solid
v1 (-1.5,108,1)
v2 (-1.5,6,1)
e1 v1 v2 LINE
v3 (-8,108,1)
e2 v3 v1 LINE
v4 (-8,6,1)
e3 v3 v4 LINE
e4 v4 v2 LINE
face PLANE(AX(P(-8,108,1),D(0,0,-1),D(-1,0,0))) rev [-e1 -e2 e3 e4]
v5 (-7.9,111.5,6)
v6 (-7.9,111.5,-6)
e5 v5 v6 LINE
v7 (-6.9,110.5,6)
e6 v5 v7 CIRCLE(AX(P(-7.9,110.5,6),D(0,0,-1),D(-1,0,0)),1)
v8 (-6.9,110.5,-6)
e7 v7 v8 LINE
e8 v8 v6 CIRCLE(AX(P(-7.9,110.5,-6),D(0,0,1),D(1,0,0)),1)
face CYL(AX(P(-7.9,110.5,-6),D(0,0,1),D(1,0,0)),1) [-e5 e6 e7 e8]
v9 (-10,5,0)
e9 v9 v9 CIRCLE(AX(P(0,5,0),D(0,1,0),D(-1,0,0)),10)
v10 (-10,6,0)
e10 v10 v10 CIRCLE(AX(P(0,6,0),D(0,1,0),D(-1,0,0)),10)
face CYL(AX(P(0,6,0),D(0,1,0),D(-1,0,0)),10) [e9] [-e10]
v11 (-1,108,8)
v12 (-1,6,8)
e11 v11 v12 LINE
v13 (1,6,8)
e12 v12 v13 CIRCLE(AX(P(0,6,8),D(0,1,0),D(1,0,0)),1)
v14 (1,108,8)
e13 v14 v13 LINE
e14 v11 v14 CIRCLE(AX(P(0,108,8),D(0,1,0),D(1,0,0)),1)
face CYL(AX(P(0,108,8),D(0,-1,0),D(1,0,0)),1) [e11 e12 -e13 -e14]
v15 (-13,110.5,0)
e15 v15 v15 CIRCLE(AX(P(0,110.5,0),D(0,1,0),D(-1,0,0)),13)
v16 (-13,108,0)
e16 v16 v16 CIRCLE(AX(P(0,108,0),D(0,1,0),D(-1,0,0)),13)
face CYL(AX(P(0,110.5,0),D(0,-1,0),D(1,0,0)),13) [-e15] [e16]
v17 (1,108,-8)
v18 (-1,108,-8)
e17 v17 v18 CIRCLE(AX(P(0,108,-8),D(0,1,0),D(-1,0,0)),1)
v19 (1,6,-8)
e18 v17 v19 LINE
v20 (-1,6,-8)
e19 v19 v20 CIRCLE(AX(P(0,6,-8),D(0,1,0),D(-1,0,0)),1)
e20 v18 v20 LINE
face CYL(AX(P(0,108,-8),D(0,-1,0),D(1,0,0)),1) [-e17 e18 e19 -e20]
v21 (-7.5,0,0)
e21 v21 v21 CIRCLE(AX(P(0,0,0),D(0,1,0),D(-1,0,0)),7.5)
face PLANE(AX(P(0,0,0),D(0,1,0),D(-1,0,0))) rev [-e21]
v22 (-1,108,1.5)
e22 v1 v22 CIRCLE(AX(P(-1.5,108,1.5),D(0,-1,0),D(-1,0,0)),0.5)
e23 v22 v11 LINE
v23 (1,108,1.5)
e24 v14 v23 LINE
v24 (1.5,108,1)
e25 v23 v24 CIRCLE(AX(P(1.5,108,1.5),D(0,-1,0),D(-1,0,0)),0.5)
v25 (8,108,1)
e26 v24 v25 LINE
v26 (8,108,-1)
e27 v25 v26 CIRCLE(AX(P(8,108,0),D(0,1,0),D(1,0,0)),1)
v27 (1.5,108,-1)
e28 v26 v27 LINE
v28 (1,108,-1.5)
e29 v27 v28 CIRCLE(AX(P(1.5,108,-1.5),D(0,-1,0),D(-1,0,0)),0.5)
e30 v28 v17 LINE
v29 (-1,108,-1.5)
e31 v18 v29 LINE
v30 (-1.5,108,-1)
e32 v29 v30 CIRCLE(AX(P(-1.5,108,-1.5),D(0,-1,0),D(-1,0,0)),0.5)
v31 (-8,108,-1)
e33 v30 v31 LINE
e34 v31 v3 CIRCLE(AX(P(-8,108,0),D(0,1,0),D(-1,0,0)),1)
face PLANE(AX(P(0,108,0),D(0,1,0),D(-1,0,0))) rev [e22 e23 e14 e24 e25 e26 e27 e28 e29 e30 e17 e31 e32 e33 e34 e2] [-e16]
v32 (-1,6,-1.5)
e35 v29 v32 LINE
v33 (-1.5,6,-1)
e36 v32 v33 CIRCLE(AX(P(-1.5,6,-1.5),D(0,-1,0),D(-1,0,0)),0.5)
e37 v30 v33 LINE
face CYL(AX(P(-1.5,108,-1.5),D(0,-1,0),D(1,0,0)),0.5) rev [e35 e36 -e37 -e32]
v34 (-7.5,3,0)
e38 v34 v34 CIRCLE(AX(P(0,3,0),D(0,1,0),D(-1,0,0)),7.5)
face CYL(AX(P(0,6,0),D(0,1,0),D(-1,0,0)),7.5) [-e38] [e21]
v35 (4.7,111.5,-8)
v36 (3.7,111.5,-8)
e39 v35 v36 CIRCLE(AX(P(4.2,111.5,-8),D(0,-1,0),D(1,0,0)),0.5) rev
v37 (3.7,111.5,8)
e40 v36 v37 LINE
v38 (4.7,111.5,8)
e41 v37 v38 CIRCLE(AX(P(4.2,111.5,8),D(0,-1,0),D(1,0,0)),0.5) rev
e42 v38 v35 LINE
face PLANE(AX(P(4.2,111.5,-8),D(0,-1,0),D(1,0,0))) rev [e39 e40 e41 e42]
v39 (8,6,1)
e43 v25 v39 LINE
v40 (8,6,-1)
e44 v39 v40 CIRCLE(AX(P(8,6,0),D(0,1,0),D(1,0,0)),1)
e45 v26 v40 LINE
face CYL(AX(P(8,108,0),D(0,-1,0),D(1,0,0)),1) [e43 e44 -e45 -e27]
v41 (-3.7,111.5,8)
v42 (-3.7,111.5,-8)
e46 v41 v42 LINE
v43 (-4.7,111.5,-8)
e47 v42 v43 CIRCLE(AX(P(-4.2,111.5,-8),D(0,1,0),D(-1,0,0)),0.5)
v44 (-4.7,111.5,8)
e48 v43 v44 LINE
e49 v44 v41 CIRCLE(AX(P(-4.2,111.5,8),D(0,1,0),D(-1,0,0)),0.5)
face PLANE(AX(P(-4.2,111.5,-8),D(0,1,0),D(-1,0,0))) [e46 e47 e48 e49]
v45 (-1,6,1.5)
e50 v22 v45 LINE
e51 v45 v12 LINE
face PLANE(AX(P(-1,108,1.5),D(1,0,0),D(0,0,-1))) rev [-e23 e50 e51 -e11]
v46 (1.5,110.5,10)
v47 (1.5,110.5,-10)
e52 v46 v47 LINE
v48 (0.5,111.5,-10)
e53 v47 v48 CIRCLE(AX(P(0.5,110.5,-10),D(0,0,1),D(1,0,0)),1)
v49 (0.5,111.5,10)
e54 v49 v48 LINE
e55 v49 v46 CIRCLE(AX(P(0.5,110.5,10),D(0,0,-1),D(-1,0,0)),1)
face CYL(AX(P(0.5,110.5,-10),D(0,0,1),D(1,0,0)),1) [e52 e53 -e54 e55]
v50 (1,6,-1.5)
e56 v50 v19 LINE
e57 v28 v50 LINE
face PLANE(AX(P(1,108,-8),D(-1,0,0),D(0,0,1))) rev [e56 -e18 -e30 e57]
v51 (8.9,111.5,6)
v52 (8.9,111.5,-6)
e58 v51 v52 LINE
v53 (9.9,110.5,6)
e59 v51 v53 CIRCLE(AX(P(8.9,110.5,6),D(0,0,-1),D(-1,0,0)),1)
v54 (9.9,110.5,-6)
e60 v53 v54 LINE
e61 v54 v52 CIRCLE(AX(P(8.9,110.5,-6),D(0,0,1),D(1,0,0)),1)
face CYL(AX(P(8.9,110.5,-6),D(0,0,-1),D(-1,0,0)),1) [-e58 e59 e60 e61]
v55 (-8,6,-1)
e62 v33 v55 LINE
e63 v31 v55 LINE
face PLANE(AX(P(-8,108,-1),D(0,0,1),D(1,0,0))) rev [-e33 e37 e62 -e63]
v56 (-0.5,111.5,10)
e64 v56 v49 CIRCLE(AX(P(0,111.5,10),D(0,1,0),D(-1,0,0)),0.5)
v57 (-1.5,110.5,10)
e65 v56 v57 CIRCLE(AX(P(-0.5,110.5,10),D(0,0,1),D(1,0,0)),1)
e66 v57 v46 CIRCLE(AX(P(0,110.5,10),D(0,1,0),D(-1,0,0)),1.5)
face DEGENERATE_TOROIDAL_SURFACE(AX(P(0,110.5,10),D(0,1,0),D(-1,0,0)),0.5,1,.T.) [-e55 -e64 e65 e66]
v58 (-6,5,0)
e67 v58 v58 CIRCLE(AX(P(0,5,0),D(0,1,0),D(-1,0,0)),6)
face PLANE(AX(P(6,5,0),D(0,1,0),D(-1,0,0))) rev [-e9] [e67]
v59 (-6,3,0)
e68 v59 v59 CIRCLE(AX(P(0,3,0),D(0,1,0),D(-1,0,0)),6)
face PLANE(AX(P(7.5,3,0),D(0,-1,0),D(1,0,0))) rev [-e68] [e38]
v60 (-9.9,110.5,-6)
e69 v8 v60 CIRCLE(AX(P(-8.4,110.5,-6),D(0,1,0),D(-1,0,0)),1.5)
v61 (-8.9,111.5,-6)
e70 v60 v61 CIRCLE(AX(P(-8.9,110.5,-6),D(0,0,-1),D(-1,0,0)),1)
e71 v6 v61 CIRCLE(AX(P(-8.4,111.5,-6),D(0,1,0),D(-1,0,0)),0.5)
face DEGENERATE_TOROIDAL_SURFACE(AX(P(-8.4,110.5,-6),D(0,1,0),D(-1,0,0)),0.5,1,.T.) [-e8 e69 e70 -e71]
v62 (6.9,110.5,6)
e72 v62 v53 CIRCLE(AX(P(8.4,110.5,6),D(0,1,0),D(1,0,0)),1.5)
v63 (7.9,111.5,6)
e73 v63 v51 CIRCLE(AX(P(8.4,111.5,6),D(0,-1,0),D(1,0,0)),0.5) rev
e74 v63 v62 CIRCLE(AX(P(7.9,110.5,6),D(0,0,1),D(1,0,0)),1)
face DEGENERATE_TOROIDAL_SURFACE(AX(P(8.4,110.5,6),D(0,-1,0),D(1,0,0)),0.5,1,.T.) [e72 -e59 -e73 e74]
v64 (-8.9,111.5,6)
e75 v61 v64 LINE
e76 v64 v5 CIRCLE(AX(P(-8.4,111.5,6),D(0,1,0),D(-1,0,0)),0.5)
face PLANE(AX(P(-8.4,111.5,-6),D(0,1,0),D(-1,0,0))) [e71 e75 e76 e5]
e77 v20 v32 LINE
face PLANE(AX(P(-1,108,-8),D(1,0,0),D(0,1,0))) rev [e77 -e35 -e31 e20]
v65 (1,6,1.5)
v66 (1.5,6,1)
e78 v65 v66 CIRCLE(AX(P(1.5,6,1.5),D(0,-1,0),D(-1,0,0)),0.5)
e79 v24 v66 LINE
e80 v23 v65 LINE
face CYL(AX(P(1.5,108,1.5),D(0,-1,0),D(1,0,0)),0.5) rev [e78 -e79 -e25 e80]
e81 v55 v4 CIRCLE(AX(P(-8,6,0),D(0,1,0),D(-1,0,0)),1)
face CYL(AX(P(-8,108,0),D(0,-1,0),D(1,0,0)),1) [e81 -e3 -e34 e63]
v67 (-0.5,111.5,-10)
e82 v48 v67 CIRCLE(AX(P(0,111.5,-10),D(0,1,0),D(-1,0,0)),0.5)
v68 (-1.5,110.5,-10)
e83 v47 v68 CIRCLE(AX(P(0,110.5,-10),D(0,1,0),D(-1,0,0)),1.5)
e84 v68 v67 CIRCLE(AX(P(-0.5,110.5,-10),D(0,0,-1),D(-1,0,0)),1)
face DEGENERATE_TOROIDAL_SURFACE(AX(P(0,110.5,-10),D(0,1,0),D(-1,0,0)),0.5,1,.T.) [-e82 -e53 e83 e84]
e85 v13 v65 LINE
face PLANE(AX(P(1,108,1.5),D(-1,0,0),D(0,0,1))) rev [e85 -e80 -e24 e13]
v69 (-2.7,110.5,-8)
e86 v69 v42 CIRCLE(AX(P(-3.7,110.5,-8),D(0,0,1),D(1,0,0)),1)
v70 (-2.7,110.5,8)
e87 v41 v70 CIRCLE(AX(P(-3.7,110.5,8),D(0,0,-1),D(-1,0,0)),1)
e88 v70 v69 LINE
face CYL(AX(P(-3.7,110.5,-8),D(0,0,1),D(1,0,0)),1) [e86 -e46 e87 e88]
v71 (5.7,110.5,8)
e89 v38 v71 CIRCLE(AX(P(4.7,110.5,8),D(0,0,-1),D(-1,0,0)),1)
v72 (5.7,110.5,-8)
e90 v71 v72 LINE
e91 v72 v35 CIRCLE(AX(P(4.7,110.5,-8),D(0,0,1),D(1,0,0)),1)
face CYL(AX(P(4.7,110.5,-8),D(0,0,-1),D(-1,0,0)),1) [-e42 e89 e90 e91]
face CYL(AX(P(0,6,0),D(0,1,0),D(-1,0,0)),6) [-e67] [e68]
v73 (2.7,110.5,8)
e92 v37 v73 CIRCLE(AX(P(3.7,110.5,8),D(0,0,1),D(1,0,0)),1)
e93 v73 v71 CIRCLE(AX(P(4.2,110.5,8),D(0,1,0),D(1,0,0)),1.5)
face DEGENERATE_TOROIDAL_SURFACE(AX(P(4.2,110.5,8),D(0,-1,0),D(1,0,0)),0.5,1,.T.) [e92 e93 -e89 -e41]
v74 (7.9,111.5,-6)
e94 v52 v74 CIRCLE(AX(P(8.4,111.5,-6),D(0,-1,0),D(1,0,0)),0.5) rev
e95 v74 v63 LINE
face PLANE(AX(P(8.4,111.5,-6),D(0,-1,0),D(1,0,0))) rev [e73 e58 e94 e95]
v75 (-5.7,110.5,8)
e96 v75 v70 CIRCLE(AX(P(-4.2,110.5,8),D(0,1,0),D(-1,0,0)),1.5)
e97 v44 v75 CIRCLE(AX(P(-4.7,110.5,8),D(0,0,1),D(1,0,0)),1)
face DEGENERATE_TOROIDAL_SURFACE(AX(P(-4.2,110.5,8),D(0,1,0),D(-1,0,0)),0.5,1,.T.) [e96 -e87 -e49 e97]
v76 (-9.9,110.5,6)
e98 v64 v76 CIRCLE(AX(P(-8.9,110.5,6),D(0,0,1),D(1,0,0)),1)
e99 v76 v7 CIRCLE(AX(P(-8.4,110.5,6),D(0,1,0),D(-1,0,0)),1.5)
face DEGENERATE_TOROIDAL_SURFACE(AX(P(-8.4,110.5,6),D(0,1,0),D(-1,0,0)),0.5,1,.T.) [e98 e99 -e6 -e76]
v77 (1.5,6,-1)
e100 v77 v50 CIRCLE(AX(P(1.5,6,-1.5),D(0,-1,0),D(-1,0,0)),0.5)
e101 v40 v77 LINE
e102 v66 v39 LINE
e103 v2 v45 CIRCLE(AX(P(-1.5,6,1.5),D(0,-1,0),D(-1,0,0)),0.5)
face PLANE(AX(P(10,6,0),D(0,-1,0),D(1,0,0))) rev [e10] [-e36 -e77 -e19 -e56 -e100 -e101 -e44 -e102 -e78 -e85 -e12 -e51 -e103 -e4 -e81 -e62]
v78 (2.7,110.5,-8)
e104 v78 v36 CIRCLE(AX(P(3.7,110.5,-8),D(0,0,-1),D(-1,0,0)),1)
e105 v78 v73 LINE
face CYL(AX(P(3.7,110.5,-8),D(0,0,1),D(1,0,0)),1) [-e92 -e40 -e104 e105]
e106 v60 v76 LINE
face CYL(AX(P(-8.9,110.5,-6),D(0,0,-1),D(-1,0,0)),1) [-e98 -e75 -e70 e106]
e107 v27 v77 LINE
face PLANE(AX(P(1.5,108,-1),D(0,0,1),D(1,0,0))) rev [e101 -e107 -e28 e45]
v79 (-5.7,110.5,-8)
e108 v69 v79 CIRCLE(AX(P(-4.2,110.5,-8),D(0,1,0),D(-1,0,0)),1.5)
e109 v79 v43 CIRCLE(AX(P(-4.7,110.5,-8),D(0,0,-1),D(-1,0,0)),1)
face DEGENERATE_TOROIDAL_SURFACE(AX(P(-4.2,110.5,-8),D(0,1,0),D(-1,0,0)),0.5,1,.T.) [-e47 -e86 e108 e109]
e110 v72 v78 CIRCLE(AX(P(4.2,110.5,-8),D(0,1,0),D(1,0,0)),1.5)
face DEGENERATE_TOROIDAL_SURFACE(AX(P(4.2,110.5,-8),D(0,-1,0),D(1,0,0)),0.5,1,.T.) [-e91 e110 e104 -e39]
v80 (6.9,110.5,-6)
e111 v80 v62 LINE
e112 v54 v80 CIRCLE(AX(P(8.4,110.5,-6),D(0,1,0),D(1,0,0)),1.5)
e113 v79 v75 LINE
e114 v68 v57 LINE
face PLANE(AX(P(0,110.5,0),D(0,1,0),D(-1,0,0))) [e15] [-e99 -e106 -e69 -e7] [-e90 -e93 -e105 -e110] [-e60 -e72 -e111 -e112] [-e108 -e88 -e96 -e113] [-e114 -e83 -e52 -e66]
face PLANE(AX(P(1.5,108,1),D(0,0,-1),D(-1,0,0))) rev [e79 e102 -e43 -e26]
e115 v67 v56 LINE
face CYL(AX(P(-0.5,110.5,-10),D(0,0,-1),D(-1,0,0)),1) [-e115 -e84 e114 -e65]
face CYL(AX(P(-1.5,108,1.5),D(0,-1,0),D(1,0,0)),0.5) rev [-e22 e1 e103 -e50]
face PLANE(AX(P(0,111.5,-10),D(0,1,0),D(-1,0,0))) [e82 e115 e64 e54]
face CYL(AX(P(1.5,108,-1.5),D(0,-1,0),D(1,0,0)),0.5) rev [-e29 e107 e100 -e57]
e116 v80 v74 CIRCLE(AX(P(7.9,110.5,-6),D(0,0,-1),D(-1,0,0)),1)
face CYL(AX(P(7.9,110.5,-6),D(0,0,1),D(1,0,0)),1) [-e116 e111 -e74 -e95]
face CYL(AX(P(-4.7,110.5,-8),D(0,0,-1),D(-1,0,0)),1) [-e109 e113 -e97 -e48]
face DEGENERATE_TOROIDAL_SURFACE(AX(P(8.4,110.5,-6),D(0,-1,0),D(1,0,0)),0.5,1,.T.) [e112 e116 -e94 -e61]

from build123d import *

# Parameters (mm, degrees)
BOSS_EXTRUDE1_DEPTH = 102
SKETCH3_R           = 13
BOSS_EXTRUDE2_DEPTH = 2.5
BOSS_EXTRUDE3_DEPTH = 1
FILLET1_R           = 1


with BuildPart() as part:
    # Sketch1 → Revolve1 (revolve)
    with BuildSketch(Plane.XY, mode=Mode.PRIVATE) as revolve1_sk:
        Polygon((0, 0), (7.5, 0), (7.5, 3), (6, 3), (6, 5), (10, 5), (10, 6), (0, 6), align=None)
    revolve(revolve1_sk.sketch.rotate(Axis((0, 6, 0), (0, -1, 0)), 180), axis=Axis((0, 6, 0), (0, -1, 0)))

    # Sketch2 → Boss-Extrude1 (add)
    with BuildSketch(Plane(origin=(0, 6, 0), x_dir=(1, 0, 0), z_dir=(0, 1, 0))):
        with BuildLine():
            Line((-1, 8), (-1, 1.5))
            ThreePointArc((-1, 1.5), (-1.146446609, 1.146446609), (-1.5, 1))
            Line((-1.5, 1), (-8, 1))
            ThreePointArc((-8, 1), (-9, 0), (-8, -1))
            Line((-8, -1), (-1.5, -1))
            ThreePointArc((-1.5, -1), (-1.146446609, -1.146446609), (-1, -1.5))
            Line((-1, -1.5), (-1, -8))
            ThreePointArc((-1, -8), (0, -9), (1, -8))
            Line((1, -8), (1, -1.5))
            ThreePointArc((1, -1.5), (1.146446609, -1.146446609), (1.5, -1))
            Line((1.5, -1), (8, -1))
            ThreePointArc((8, -1), (9, 0), (8, 1))
            Line((8, 1), (1.5, 1))
            ThreePointArc((1.5, 1), (1.146446609, 1.146446609), (1, 1.5))
            Line((1, 1.5), (1, 8))
            ThreePointArc((1, 8), (0, 9), (-1, 8))
        make_face()
    extrude(amount=BOSS_EXTRUDE1_DEPTH)

    # Sketch3 → Boss-Extrude2 (add)
    with BuildSketch(Plane(origin=(0, 108, 0), x_dir=(1, 0, 0), z_dir=(0, 1, 0))):
        with Locations(Location((0, 0, 0), (0, 0, 180))):
            Circle(SKETCH3_R)
    extrude(amount=BOSS_EXTRUDE2_DEPTH)

    # Sketch4 → Boss-Extrude3 (add)
    with BuildSketch(Plane(origin=(0, 110.5, 0), x_dir=(1, 0, 0), z_dir=(0, 1, 0))):
        with BuildLine():
            Line((-1.5, 10), (-1.5, -10))
            ThreePointArc((-1.5, -10), (0, -11.5), (1.5, -10))
            Line((1.5, -10), (1.5, 10))
            ThreePointArc((1.5, 10), (0, 11.5), (-1.5, 10))
        make_face()
        with BuildLine():
            Line((-5.7, 8), (-5.7, -8))
            ThreePointArc((-5.7, -8), (-4.2, -9.5), (-2.7, -8))
            Line((-2.7, -8), (-2.7, 8))
            ThreePointArc((-2.7, 8), (-4.2, 9.5), (-5.7, 8))
        make_face()
        with BuildLine():
            Line((-9.9, 6), (-9.9, -6))
            ThreePointArc((-9.9, -6), (-8.4, -7.5), (-6.9, -6))
            Line((-6.9, -6), (-6.9, 6))
            ThreePointArc((-6.9, 6), (-8.4, 7.5), (-9.9, 6))
        make_face()
        with BuildLine():
            Line((9.9, 6), (9.9, -6))
            ThreePointArc((9.9, -6), (8.4, -7.5), (6.9, -6))
            Line((6.9, -6), (6.9, 6))
            ThreePointArc((6.9, 6), (8.4, 7.5), (9.9, 6))
        make_face()
        with BuildLine():
            Line((5.7, 8), (5.7, -8))
            ThreePointArc((5.7, -8), (4.2, -9.5), (2.7, -8))
            Line((2.7, -8), (2.7, 8))
            ThreePointArc((2.7, 8), (4.2, 9.5), (5.7, 8))
        make_face()
    extrude(amount=BOSS_EXTRUDE3_DEPTH)

    # Fillet1
    fillet1_edges = [part.edges().sort_by_distance(p)[0] for p in [
        (9.9, 111.5, 0),
        (8.4, 111.5, 7.5),
        (6.9, 111.5, 0),
        (8.4, 111.5, -7.5),
        (5.7, 111.5, 0),
        (4.2, 111.5, 9.5),
        (2.7, 111.5, 0),
        (4.2, 111.5, -9.5),
        (1.5, 111.5, 0),
        (0, 111.5, 11.5),
        (-1.5, 111.5, 0),
        (0, 111.5, -11.5),
        (-2.7, 111.5, 0),
        (-4.2, 111.5, 9.5),
        (-5.7, 111.5, 0),
        (-4.2, 111.5, -9.5),
        (-6.9, 111.5, 0),
        (-8.4, 111.5, 7.5),
        (-9.9, 111.5, 0),
        (-8.4, 111.5, -7.5),
    ]]
    fillet(fillet1_edges, radius=FILLET1_R - 0.0001)  # a hair under: the kernel refuses the full size


solid = part.part
